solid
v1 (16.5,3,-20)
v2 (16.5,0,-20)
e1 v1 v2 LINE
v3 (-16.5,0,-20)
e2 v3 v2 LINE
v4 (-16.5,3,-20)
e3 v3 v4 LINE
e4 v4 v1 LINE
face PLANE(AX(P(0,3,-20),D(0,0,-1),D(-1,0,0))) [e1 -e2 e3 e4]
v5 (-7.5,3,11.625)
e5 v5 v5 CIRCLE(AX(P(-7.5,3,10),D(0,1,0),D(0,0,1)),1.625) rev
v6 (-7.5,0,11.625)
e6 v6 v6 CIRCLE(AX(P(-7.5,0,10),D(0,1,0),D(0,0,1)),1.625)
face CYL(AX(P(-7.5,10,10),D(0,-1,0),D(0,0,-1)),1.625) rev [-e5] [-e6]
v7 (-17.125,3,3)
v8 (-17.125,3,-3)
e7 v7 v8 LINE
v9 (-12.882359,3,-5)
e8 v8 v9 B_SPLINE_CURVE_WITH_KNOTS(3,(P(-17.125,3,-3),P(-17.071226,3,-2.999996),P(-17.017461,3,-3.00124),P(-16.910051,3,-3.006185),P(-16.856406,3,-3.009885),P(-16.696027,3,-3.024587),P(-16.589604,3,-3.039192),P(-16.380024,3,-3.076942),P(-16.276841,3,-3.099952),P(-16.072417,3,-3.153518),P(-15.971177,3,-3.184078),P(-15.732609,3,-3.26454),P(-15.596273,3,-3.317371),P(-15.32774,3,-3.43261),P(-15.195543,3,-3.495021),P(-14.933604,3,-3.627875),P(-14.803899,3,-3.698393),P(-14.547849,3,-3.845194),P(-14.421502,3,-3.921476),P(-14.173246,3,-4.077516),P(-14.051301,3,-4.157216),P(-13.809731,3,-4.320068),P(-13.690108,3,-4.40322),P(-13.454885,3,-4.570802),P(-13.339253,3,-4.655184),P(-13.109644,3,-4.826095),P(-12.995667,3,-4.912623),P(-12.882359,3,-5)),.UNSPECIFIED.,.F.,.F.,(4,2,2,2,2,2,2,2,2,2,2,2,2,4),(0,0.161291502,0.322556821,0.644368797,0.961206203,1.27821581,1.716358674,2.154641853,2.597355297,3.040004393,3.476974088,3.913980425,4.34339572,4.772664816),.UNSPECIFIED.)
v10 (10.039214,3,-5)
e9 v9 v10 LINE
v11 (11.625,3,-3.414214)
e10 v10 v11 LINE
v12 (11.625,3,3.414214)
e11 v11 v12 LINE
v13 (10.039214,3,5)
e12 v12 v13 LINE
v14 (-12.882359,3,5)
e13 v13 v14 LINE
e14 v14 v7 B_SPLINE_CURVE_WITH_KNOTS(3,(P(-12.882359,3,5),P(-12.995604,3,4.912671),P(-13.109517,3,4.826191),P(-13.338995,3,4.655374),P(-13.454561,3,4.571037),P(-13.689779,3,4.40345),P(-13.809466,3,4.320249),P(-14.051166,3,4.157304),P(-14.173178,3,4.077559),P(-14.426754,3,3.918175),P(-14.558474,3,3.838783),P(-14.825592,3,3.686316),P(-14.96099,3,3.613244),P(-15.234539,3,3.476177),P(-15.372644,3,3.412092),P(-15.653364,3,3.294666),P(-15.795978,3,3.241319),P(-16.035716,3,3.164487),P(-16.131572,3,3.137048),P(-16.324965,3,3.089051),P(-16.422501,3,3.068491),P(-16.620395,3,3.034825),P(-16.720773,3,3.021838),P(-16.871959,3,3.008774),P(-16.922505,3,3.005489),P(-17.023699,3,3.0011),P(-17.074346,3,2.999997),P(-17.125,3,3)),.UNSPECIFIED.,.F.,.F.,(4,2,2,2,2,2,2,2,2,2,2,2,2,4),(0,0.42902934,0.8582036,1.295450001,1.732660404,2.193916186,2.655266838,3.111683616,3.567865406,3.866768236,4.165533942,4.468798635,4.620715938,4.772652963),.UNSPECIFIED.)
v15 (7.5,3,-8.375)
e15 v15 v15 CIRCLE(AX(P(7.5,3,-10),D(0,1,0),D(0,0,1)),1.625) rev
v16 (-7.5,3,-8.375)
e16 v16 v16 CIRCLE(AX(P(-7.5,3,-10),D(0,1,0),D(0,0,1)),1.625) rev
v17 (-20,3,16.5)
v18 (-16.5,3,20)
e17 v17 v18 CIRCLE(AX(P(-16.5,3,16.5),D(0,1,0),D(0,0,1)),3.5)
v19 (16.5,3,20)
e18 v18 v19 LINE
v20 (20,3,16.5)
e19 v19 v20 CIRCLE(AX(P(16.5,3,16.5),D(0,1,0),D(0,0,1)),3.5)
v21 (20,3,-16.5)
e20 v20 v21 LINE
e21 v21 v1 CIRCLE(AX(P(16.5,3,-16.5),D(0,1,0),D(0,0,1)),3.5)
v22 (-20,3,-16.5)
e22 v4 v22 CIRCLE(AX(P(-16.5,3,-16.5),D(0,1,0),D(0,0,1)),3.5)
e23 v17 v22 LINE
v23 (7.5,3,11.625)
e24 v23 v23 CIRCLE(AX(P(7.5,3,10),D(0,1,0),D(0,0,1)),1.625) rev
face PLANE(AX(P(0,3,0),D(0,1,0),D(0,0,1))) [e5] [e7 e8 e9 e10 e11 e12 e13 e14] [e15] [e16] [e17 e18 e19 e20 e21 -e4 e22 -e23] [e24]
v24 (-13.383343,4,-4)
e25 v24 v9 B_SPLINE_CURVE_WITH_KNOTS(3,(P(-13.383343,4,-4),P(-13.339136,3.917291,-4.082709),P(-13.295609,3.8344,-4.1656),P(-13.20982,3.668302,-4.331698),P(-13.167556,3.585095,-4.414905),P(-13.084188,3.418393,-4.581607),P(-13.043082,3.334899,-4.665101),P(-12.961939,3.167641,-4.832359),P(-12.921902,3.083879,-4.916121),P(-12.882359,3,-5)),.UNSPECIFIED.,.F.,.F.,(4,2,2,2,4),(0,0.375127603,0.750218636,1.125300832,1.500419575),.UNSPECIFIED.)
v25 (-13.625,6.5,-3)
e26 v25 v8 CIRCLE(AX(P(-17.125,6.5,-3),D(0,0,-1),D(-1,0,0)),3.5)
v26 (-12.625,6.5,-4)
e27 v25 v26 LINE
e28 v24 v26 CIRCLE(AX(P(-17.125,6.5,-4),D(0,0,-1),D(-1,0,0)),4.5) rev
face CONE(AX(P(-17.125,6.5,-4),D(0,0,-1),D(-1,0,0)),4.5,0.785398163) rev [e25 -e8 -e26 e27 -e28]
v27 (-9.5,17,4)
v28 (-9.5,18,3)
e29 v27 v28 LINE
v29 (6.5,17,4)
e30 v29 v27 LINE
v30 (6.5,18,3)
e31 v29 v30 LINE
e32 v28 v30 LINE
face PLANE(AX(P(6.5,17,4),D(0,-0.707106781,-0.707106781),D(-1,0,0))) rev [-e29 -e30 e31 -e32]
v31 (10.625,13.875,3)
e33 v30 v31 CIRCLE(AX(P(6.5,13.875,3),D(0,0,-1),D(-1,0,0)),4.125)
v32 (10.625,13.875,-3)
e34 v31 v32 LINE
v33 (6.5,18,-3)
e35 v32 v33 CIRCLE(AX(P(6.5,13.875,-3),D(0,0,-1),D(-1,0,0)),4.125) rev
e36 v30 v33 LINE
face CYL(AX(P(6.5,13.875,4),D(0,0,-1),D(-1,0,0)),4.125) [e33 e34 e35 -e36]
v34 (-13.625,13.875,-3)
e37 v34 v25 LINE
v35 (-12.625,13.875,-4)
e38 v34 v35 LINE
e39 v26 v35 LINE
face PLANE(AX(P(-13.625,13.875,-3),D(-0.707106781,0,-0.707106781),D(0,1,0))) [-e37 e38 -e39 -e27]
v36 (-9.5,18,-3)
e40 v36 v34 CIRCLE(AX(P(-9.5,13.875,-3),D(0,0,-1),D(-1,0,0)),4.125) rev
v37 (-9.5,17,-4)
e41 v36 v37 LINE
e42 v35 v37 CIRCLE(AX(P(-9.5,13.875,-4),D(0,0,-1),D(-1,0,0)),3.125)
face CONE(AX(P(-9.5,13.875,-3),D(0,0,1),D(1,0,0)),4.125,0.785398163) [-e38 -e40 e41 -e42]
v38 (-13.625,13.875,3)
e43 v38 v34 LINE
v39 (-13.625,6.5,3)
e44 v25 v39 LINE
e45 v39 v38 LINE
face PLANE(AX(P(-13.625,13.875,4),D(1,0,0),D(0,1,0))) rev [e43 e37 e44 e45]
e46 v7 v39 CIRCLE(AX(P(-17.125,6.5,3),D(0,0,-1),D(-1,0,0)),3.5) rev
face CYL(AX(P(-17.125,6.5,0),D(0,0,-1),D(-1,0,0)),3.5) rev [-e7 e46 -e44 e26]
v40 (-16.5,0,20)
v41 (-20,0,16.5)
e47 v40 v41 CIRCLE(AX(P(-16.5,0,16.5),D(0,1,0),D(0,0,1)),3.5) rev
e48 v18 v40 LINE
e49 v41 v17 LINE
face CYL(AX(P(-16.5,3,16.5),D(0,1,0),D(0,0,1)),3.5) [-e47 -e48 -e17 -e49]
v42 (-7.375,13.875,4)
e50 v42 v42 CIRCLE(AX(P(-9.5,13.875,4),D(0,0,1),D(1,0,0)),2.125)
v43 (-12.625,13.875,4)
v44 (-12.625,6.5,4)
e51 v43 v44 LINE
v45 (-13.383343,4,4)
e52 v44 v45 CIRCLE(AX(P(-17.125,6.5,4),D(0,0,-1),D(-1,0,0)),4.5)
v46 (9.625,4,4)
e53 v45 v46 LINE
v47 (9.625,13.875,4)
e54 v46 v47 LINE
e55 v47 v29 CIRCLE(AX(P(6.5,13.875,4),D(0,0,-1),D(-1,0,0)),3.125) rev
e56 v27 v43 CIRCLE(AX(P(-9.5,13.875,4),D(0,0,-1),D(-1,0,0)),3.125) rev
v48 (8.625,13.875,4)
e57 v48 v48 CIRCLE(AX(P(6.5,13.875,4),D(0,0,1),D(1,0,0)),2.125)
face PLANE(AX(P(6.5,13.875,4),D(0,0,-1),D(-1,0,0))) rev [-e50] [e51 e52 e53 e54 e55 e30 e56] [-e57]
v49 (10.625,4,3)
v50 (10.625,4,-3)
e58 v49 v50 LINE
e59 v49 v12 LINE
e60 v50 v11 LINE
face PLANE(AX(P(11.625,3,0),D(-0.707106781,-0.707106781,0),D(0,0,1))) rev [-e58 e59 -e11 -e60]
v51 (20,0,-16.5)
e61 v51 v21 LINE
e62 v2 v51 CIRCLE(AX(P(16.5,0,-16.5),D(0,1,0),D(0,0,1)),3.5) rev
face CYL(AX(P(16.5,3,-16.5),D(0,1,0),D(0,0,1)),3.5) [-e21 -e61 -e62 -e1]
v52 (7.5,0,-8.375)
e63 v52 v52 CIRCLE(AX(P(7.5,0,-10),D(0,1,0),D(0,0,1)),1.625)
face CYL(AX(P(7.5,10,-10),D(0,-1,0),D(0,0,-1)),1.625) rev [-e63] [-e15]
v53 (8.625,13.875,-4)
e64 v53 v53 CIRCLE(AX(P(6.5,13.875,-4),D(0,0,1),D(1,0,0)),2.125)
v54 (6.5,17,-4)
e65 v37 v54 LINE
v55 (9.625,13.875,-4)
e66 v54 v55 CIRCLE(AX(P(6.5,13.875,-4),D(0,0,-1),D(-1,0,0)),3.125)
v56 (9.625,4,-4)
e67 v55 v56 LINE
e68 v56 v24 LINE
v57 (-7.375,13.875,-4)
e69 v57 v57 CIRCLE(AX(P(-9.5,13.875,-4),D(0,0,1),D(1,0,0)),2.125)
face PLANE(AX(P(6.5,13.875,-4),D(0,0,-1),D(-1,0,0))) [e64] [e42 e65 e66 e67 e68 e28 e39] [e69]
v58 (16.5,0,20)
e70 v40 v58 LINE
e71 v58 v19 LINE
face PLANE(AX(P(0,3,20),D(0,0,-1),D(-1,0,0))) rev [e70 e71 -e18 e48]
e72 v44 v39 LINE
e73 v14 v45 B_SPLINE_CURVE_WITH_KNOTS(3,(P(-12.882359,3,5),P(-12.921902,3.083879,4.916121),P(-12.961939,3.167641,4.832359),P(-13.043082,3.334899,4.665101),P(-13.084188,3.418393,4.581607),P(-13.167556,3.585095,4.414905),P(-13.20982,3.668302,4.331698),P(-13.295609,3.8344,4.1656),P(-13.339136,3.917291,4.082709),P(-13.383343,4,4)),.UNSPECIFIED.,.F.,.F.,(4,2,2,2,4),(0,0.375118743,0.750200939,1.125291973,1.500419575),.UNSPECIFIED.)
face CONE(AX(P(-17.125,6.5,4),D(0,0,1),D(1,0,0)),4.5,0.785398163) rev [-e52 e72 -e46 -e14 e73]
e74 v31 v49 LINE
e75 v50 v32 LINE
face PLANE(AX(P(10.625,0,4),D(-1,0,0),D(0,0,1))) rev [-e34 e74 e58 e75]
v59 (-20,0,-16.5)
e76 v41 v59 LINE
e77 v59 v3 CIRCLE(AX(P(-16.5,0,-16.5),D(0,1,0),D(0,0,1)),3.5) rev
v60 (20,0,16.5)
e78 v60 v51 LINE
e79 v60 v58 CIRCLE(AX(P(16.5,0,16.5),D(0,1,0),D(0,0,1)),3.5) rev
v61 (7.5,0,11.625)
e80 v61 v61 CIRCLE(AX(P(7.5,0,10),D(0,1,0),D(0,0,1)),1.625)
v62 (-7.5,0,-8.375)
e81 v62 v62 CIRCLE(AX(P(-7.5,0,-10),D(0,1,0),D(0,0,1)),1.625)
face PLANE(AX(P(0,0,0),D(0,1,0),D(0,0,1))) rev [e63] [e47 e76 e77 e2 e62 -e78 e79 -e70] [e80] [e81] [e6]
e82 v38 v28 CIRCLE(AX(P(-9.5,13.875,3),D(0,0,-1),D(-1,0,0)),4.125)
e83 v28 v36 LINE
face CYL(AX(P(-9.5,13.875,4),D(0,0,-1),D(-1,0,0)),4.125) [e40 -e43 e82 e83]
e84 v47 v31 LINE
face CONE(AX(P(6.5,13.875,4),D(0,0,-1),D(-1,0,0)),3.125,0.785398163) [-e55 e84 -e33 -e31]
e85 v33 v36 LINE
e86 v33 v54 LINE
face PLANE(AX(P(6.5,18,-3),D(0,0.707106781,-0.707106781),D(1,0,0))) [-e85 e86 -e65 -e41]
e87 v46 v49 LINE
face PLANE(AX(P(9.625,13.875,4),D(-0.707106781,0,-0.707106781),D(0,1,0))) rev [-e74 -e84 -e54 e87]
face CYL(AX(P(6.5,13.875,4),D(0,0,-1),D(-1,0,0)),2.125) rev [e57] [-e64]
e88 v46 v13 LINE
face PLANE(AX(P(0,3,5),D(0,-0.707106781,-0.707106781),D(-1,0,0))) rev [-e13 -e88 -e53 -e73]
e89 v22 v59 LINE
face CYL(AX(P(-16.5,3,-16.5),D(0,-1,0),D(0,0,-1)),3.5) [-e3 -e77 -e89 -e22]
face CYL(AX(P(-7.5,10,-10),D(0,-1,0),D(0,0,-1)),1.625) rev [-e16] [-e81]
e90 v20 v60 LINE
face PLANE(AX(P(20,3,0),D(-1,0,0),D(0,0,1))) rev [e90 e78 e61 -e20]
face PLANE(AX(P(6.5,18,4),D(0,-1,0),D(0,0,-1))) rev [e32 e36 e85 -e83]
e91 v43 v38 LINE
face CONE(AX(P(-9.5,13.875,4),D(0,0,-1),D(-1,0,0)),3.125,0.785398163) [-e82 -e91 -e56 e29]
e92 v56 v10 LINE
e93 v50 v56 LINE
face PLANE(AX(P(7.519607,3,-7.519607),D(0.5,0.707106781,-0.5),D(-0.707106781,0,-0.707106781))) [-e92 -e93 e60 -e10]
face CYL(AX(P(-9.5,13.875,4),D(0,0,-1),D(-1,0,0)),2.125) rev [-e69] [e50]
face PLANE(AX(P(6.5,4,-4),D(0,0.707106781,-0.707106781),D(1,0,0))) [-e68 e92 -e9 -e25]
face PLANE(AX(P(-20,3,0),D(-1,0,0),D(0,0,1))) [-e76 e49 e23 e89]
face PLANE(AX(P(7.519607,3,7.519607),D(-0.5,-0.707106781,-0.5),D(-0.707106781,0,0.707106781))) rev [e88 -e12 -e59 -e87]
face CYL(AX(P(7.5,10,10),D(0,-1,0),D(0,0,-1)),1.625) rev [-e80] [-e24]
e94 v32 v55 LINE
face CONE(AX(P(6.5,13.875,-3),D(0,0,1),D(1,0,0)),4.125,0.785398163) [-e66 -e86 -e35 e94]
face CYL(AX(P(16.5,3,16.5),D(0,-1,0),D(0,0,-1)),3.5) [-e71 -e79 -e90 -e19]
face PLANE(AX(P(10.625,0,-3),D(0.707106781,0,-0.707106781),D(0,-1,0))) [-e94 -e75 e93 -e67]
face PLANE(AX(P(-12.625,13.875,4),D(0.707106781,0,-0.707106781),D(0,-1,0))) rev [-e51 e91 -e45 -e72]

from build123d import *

# Parameters (mm, degrees)
SKETCH1_W           = 40
SKETCH1_H           = 40
BOSS_EXTRUDE1_DEPTH = 3
FILLET1_R           = 3.5
SKETCH2_R           = 2.125
BOSS_EXTRUDE2_DEPTH = 4
FILLET2_R           = 3.5
CHAMFER1_SIZE       = 1
CHAMFER2_SIZE       = 1
SKETCH4_R           = 1.625
CUT_EXTRUDE4_DEPTH  = 10


with BuildPart() as part:
    # Sketch1 → Boss-Extrude1 (new body)
    with BuildSketch(Plane(origin=(0, 0, 0), x_dir=(1, 0, 0), z_dir=(0, 1, 0))):
        Rectangle(SKETCH1_W, SKETCH1_H)
    extrude(amount=BOSS_EXTRUDE1_DEPTH)

    # Fillet1
    fillet1_edges = [part.edges().sort_by_distance(p)[0] for p in [
        (-20, 1.5, 20),
        (-20, 1.5, -20),
        (20, 1.5, -20),
        (20, 1.5, 20),
    ]]
    fillet(fillet1_edges, radius=FILLET1_R)

    # Sketch2 → Boss-Extrude2 (add, symmetric)
    with BuildSketch(Plane.XY):
        with BuildLine():
            Line((-1.5, 0), (10.625, 0))
            Line((10.625, 0), (10.625, 13.875))
            ThreePointArc((10.625, 13.875), (9.416815472, 16.791815472), (6.5, 18))
            Line((6.5, 18), (-9.5, 18))
            ThreePointArc((-9.5, 18), (-12.416815472, 16.791815472), (-13.625, 13.875))
            Line((-13.625, 13.875), (-13.625, 0))
            Line((-13.625, 0), (-1.5, 0))
        make_face()
        with Locations((-9.5, 13.875)):
            Circle(SKETCH2_R, mode=Mode.SUBTRACT)
        with Locations((6.5, 13.875)):
            Circle(SKETCH2_R, mode=Mode.SUBTRACT)
    extrude(amount=BOSS_EXTRUDE2_DEPTH, both=True)

    # Fillet2
    fillet2_edges = [part.edges().sort_by_distance(p)[0] for p in [
        (-13.625, 3, 0),
    ]]
    fillet(fillet2_edges, radius=FILLET2_R)

    # Chamfer1
    # the kernel refuses this chamfer: 1 mm, written as the material it takes off along each edge
    with BuildSketch(Plane(origin=(-17.125, 6.5, -4), x_dir=(-0.6706329473594386, -0.7417893568365567, 0), z_dir=(-0.7417893568365567, 0.6706329473594386, 0))) as chamfer1_piece_1_section:
        Polygon((3.5, CHAMFER1_SIZE), (3.5 + CHAMFER1_SIZE, 0), (3.5, 0), align=None)
    chamfer1_piece_1 = revolve(axis=Axis((-17.125, 6.5, -4), (0, 0, 1)), revolution_arc=132.115934794, mode=Mode.PRIVATE)
    chamfer1_piece_1 = split(chamfer1_piece_1, bisect_by=Plane(origin=(-14.562264523, 3, -3.629385384), z_dir=(0, 1, 0)), keep=Keep.TOP, mode=Mode.PRIVATE)
    add(chamfer1_piece_1, mode=Mode.SUBTRACT)
    with BuildSketch(Plane(origin=(-17.125, 6.5, 4), x_dir=(-0.6706329473594386, -0.7417893568365567, 0), z_dir=(-0.7417893568365567, 0.6706329473594386, 0))) as chamfer1_piece_2_section:
        Polygon((3.5, -CHAMFER1_SIZE), (3.5 + CHAMFER1_SIZE, 0), (3.5, 0), align=None)
    chamfer1_piece_2 = revolve(axis=Axis((-17.125, 6.5, 4), (0, 0, 1)), revolution_arc=132.115934794, mode=Mode.PRIVATE)
    chamfer1_piece_2 = split(chamfer1_piece_2, bisect_by=Plane(origin=(-14.562264523, 3, 3.629385384), z_dir=(0, 1, 0)), keep=Keep.TOP, mode=Mode.PRIVATE)
    add(chamfer1_piece_2, mode=Mode.SUBTRACT)
    with BuildSketch(Plane(origin=(10.625, 3, 4), x_dir=(-0.9996219169112968, 0, 0.02749587661058651), z_dir=(0, 1, 0)), Plane(origin=(10.625, 3, -4), x_dir=(0.027495876610585623, 0, 0.9996219169112968), z_dir=(0, 1, 0))) as chamfer1_piece_3:
        Polygon((CHAMFER1_SIZE * 0.999621916911, -CHAMFER1_SIZE * 0.0274958766106), (-CHAMFER1_SIZE * 0.0274958766106, -CHAMFER1_SIZE * 0.999621916911), (0, 0), align=None)
    extrude(amount=10.875, mode=Mode.SUBTRACT)
    with BuildSketch(Plane(origin=(6.5, 13.875, 4), x_dir=(1, 0, 0), z_dir=(0, -1, 0))) as chamfer1_piece_4:
        Polygon((4.125, -CHAMFER1_SIZE), (4.125 - CHAMFER1_SIZE, 0), (4.125, 0), align=None)
    revolve(axis=Axis((6.5, 13.875, 4), (0, 0, 1)), revolution_arc=90, mode=Mode.SUBTRACT)
    with BuildSketch(Plane(origin=(6.5, 18, 4), x_dir=(0, 0.027495876610585623, -0.9996219169112968), z_dir=(-1, 0, 0))) as chamfer1_piece_5:
        Polygon((CHAMFER1_SIZE * 0.999621916911, CHAMFER1_SIZE * 0.0274958766106), (-CHAMFER1_SIZE * 0.0274958766106, CHAMFER1_SIZE * 0.999621916911), (0, 0), align=None)
    extrude(amount=16, mode=Mode.SUBTRACT)
    with BuildSketch(Plane(origin=(-9.5, 13.875, 4), x_dir=(0, 1, 0), z_dir=(1, 0, 0))) as chamfer1_piece_6:
        Polygon((4.125, -CHAMFER1_SIZE), (4.125 - CHAMFER1_SIZE, 0), (4.125, 0), align=None)
    revolve(axis=Axis((-9.5, 13.875, 4), (0, 0, 1)), revolution_arc=90, mode=Mode.SUBTRACT)
    with BuildSketch(Plane(origin=(-13.625, 13.875, 4), x_dir=(-0.027495876610585623, 0, -0.9996219169112968), z_dir=(0, -1, 0))) as chamfer1_piece_7:
        Polygon((CHAMFER1_SIZE * 0.999621916911, CHAMFER1_SIZE * 0.0274958766106), (-CHAMFER1_SIZE * 0.0274958766106, CHAMFER1_SIZE * 0.999621916911), (0, 0), align=None)
    extrude(amount=7.375, mode=Mode.SUBTRACT)
    with BuildSketch(Plane(origin=(6.5, 13.875, -4), x_dir=(1, 0, 0), z_dir=(0, -1, 0))) as chamfer1_piece_8:
        Polygon((4.125, CHAMFER1_SIZE), (4.125 - CHAMFER1_SIZE, 0), (4.125, 0), align=None)
    revolve(axis=Axis((6.5, 13.875, -4), (0, 0, 1)), revolution_arc=90, mode=Mode.SUBTRACT)
    with BuildSketch(Plane(origin=(6.5, 18, -4), x_dir=(0, 0.027495876610585623, 0.9996219169112968), z_dir=(-1, 0, 0))) as chamfer1_piece_9:
        Polygon((CHAMFER1_SIZE * 0.999621916911, -CHAMFER1_SIZE * 0.0274958766106), (-CHAMFER1_SIZE * 0.0274958766106, -CHAMFER1_SIZE * 0.999621916911), (0, 0), align=None)
    extrude(amount=16, mode=Mode.SUBTRACT)
    with BuildSketch(Plane(origin=(-9.5, 13.875, -4), x_dir=(0, 1, 0), z_dir=(1, 0, 0))) as chamfer1_piece_10:
        Polygon((4.125, CHAMFER1_SIZE), (4.125 - CHAMFER1_SIZE, 0), (4.125, 0), align=None)
    revolve(axis=Axis((-9.5, 13.875, -4), (0, 0, 1)), revolution_arc=90, mode=Mode.SUBTRACT)
    with BuildSketch(Plane(origin=(-13.625, 13.875, -4), x_dir=(-0.027495876610585623, 0, 0.9996219169112968), z_dir=(0, -1, 0))) as chamfer1_piece_11:
        Polygon((CHAMFER1_SIZE * 0.999621916911, -CHAMFER1_SIZE * 0.0274958766106), (-CHAMFER1_SIZE * 0.0274958766106, -CHAMFER1_SIZE * 0.999621916911), (0, 0), align=None)
    extrude(amount=7.375, mode=Mode.SUBTRACT)

    # Chamfer2
    chamfer2_edges = [part.edges().sort_by_distance(p)[0] for p in [
        (-2.335786438, 3, -4),
        (10.625, 3, 0),
        (-2.335786438, 3, 4),
        (10.125, 3, -3.5),
        (10.125, 3, 3.5),
    ]]
    chamfer(chamfer2_edges, length=CHAMFER2_SIZE)

    # Sketch4 → Cut-Extrude4 (cut)
    with BuildSketch(Plane(origin=(0, 0, 0), x_dir=(1, 0, 0), z_dir=(0, 1, 0))):
        with Locations(Location((-7.5, 10, 0), (0, 0, 270))):
            Circle(SKETCH4_R)
        with Locations(Location((7.5, 10, 0), (0, 0, 270))):
            Circle(SKETCH4_R)
        with Locations(Location((7.5, -10, 0), (0, 0, 270))):
            Circle(SKETCH4_R)
        with Locations(Location((-7.5, -10, 0), (0, 0, 270))):
            Circle(SKETCH4_R)
    extrude(amount=CUT_EXTRUDE4_DEPTH, mode=Mode.SUBTRACT)


solid = part.part
